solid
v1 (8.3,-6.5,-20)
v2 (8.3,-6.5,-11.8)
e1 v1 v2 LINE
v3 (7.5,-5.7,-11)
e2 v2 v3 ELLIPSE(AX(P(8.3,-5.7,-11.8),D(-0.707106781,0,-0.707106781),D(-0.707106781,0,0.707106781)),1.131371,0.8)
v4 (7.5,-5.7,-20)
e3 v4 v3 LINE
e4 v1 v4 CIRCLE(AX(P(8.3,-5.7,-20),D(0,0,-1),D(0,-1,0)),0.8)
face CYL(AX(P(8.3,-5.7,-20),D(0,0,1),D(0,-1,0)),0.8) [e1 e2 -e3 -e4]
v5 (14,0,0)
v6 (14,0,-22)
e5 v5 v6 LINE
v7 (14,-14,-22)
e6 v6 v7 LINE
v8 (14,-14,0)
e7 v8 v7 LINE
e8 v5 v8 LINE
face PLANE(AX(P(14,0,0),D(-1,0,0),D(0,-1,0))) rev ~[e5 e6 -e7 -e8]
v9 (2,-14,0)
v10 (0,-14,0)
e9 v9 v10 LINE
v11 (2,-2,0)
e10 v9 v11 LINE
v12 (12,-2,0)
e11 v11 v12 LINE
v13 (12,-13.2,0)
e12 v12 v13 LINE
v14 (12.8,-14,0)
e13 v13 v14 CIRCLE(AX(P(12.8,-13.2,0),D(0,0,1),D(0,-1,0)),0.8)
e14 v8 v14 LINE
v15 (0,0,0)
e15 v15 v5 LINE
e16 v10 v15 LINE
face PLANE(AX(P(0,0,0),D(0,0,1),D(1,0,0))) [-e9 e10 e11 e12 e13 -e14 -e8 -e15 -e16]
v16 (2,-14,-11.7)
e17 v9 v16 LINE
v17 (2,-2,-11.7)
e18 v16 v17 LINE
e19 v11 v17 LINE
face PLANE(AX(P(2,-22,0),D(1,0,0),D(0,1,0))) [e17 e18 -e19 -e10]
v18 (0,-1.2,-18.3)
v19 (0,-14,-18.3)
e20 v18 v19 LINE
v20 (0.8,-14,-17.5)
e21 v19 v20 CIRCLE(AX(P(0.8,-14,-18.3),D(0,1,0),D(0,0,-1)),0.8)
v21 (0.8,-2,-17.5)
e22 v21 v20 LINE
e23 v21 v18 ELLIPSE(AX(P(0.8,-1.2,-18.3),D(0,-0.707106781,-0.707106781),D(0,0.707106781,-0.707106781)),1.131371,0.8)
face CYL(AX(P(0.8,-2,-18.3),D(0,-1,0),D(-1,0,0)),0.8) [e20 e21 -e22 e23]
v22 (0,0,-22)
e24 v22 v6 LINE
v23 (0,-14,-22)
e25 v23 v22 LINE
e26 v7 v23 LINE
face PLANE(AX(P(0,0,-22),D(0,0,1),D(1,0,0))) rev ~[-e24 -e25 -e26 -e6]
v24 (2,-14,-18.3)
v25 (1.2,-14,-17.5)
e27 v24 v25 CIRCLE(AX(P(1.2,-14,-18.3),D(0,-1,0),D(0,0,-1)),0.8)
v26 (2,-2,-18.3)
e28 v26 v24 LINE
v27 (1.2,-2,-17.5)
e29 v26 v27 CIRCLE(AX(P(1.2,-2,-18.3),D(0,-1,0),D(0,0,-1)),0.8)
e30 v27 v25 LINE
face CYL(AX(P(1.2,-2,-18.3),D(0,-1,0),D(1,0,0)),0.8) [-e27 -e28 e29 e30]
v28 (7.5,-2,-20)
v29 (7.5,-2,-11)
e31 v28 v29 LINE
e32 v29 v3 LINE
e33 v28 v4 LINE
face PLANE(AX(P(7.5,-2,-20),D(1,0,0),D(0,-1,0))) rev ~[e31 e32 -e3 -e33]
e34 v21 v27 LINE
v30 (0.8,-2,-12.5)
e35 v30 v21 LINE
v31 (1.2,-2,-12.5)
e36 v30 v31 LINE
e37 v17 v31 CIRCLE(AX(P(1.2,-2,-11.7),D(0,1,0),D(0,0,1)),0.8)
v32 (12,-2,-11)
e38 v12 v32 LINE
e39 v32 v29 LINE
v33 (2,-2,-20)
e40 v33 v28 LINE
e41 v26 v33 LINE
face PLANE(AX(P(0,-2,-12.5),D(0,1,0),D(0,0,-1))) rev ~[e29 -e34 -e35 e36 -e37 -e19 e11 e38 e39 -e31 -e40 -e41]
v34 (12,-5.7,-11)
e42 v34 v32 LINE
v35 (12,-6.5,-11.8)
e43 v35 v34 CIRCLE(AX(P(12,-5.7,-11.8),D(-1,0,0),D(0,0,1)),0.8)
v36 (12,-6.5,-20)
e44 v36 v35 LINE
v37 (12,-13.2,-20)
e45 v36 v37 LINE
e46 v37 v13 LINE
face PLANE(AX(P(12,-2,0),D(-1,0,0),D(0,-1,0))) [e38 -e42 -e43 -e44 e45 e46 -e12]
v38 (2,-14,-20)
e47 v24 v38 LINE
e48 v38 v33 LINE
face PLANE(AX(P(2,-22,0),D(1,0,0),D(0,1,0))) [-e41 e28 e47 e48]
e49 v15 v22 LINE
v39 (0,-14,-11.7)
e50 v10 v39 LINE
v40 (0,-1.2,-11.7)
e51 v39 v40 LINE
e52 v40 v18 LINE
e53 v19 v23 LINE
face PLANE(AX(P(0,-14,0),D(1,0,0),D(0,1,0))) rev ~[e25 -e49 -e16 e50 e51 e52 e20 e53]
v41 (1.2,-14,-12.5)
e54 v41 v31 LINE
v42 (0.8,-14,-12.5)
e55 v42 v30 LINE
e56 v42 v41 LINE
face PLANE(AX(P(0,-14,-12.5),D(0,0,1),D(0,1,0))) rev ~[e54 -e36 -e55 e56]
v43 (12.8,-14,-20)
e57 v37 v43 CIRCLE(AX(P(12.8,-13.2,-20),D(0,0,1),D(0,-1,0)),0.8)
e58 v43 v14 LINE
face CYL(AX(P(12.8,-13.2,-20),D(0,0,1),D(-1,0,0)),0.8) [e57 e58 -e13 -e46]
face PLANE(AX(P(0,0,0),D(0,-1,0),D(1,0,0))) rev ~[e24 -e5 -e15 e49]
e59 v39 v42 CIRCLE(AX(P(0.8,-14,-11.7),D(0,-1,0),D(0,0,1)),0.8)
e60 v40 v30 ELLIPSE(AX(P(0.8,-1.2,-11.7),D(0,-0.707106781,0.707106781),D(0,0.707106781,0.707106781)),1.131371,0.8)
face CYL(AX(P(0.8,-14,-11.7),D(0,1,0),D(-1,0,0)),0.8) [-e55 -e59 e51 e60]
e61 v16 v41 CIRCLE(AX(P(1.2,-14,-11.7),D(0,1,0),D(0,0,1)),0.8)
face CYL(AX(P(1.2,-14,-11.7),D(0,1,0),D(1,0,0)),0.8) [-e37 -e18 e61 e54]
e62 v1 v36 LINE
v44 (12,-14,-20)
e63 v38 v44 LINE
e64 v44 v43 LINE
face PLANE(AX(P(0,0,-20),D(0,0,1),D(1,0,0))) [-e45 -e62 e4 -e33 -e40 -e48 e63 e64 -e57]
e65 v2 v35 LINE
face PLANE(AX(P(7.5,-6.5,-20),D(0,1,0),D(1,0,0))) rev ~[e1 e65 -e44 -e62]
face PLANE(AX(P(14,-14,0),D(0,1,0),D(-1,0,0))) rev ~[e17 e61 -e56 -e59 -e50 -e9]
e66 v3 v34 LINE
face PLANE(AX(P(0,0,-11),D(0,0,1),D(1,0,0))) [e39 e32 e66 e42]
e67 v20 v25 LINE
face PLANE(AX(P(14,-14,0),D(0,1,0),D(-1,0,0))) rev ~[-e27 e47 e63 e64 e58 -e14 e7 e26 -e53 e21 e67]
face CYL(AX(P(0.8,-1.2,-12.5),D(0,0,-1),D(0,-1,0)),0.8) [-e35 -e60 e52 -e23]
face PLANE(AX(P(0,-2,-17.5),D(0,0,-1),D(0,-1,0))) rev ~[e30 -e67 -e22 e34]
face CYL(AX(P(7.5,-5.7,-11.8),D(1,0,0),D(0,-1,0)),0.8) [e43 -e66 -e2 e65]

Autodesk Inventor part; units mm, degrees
ref_plane "YZ Plane" through (0, 0, 0) normal (1, 0, 0) x (0, 1, 0)
ref_plane "XZ Plane" through (0, 0, 0) normal (0, 1, 0) x (-1, 0, 0)
ref_plane "XY Plane" through (0, 0, 0) normal (0, 0, 1) x (1, 0, 0)
sketch "Sketch1" plane through (0, 0, 0) normal (0, 0, 1) x (1, 0, 0)
  line L0 (0, 0) -> (14, 0)
  line L1 (14, 0) -> (14, -14)
  line L2 (14, -14) -> (0, -14)
  line L3 (0, -14) -> (0, 0)
  dimension "d0" = 14
  dimension "d1" = 14
extrude "Extrusion1" add sketch "Sketch1" against normal blind 22
sketch "Sketch2" plane through (0, 0, 0) normal (0, 0, 1) x (1, 0, 0)
  line L0 (2, -2) -> (12, -2)
  line L1 (12, -2) -> (12, -22)
  line L2 (12, -22) -> (2, -22)
  line L3 (2, -22) -> (2, -2)
  point P0 (0, 0)
  dimension "d4" = 10
  dimension "d5" = 20
extrude "Extrusion2" cut sketch "Sketch2" against normal blind 20
sketch "Sketch8" plane through (0, -14, 0) normal (-1, 0, 0) x (0, 0, 1)
  point P0 (0, 14)
sketch "Sketch9" plane through (0, -14, 0) normal (-1, 0, 0) x (0, 0, 1)
  point P0 (0, 14)
sketch "Sketch11" plane through (0, -14, 0) normal (-1, 0, 0) x (0, 0, 1)
  point P0 (0, 14)
sketch "Sketch14" plane through (0, -14, 0) normal (-1, 0, 0) x (0, 0, 1)
  point P0 (0, 14)
sketch "Sketch15" plane through (0, -14, 0) normal (-1, 0, 0) x (0, 0, 1)
  point P0 (0, 14)
sketch "Sketch16" plane through (0, -14, 0) normal (-1, 0, 0) x (0, 0, 1)
  line L0 (-12.5, 12) -> (-17.5, 12)
  line L1 (-17.5, 12) -> (-17.5, 0)
  line L2 (-17.5, 0) -> (-12.5, 0)
  line L3 (-12.5, 0) -> (-12.5, 12)
  point P0 (0, 14)
  dimension "d30" = 5
  dimension "d31" = 12
extrude "Extrusion10" cut sketch "Sketch16" against normal blind 2
sketch "Sketch17" plane through (0, 0, -20) normal (0, 0, 1) x (1, 0, 0)
  line L0 (12, -2) -> (7.5, -2)
  line L1 (7.5, -2) -> (7.5, -6.5)
  line L2 (7.5, -6.5) -> (12, -6.5)
  line L3 (12, -6.5) -> (12, -2)
  point P0 (0, 0)
  dimension "d34" = 4.5
  dimension "d35" = 4.5
extrude "Extrusion11" add sketch "Sketch17" along normal blind 9
fillet "Fillet1" radius 0.8 8 edges at (0, -8, -12.5) (2, -8, -12.5) (0, -2, -15) (0, -8, -17.5) (2, -8, -17.5) (12, -14, -10) (7.5, -6.5, -15.5) (9.75, -6.5, -11)
properties part number "housing_v07"
